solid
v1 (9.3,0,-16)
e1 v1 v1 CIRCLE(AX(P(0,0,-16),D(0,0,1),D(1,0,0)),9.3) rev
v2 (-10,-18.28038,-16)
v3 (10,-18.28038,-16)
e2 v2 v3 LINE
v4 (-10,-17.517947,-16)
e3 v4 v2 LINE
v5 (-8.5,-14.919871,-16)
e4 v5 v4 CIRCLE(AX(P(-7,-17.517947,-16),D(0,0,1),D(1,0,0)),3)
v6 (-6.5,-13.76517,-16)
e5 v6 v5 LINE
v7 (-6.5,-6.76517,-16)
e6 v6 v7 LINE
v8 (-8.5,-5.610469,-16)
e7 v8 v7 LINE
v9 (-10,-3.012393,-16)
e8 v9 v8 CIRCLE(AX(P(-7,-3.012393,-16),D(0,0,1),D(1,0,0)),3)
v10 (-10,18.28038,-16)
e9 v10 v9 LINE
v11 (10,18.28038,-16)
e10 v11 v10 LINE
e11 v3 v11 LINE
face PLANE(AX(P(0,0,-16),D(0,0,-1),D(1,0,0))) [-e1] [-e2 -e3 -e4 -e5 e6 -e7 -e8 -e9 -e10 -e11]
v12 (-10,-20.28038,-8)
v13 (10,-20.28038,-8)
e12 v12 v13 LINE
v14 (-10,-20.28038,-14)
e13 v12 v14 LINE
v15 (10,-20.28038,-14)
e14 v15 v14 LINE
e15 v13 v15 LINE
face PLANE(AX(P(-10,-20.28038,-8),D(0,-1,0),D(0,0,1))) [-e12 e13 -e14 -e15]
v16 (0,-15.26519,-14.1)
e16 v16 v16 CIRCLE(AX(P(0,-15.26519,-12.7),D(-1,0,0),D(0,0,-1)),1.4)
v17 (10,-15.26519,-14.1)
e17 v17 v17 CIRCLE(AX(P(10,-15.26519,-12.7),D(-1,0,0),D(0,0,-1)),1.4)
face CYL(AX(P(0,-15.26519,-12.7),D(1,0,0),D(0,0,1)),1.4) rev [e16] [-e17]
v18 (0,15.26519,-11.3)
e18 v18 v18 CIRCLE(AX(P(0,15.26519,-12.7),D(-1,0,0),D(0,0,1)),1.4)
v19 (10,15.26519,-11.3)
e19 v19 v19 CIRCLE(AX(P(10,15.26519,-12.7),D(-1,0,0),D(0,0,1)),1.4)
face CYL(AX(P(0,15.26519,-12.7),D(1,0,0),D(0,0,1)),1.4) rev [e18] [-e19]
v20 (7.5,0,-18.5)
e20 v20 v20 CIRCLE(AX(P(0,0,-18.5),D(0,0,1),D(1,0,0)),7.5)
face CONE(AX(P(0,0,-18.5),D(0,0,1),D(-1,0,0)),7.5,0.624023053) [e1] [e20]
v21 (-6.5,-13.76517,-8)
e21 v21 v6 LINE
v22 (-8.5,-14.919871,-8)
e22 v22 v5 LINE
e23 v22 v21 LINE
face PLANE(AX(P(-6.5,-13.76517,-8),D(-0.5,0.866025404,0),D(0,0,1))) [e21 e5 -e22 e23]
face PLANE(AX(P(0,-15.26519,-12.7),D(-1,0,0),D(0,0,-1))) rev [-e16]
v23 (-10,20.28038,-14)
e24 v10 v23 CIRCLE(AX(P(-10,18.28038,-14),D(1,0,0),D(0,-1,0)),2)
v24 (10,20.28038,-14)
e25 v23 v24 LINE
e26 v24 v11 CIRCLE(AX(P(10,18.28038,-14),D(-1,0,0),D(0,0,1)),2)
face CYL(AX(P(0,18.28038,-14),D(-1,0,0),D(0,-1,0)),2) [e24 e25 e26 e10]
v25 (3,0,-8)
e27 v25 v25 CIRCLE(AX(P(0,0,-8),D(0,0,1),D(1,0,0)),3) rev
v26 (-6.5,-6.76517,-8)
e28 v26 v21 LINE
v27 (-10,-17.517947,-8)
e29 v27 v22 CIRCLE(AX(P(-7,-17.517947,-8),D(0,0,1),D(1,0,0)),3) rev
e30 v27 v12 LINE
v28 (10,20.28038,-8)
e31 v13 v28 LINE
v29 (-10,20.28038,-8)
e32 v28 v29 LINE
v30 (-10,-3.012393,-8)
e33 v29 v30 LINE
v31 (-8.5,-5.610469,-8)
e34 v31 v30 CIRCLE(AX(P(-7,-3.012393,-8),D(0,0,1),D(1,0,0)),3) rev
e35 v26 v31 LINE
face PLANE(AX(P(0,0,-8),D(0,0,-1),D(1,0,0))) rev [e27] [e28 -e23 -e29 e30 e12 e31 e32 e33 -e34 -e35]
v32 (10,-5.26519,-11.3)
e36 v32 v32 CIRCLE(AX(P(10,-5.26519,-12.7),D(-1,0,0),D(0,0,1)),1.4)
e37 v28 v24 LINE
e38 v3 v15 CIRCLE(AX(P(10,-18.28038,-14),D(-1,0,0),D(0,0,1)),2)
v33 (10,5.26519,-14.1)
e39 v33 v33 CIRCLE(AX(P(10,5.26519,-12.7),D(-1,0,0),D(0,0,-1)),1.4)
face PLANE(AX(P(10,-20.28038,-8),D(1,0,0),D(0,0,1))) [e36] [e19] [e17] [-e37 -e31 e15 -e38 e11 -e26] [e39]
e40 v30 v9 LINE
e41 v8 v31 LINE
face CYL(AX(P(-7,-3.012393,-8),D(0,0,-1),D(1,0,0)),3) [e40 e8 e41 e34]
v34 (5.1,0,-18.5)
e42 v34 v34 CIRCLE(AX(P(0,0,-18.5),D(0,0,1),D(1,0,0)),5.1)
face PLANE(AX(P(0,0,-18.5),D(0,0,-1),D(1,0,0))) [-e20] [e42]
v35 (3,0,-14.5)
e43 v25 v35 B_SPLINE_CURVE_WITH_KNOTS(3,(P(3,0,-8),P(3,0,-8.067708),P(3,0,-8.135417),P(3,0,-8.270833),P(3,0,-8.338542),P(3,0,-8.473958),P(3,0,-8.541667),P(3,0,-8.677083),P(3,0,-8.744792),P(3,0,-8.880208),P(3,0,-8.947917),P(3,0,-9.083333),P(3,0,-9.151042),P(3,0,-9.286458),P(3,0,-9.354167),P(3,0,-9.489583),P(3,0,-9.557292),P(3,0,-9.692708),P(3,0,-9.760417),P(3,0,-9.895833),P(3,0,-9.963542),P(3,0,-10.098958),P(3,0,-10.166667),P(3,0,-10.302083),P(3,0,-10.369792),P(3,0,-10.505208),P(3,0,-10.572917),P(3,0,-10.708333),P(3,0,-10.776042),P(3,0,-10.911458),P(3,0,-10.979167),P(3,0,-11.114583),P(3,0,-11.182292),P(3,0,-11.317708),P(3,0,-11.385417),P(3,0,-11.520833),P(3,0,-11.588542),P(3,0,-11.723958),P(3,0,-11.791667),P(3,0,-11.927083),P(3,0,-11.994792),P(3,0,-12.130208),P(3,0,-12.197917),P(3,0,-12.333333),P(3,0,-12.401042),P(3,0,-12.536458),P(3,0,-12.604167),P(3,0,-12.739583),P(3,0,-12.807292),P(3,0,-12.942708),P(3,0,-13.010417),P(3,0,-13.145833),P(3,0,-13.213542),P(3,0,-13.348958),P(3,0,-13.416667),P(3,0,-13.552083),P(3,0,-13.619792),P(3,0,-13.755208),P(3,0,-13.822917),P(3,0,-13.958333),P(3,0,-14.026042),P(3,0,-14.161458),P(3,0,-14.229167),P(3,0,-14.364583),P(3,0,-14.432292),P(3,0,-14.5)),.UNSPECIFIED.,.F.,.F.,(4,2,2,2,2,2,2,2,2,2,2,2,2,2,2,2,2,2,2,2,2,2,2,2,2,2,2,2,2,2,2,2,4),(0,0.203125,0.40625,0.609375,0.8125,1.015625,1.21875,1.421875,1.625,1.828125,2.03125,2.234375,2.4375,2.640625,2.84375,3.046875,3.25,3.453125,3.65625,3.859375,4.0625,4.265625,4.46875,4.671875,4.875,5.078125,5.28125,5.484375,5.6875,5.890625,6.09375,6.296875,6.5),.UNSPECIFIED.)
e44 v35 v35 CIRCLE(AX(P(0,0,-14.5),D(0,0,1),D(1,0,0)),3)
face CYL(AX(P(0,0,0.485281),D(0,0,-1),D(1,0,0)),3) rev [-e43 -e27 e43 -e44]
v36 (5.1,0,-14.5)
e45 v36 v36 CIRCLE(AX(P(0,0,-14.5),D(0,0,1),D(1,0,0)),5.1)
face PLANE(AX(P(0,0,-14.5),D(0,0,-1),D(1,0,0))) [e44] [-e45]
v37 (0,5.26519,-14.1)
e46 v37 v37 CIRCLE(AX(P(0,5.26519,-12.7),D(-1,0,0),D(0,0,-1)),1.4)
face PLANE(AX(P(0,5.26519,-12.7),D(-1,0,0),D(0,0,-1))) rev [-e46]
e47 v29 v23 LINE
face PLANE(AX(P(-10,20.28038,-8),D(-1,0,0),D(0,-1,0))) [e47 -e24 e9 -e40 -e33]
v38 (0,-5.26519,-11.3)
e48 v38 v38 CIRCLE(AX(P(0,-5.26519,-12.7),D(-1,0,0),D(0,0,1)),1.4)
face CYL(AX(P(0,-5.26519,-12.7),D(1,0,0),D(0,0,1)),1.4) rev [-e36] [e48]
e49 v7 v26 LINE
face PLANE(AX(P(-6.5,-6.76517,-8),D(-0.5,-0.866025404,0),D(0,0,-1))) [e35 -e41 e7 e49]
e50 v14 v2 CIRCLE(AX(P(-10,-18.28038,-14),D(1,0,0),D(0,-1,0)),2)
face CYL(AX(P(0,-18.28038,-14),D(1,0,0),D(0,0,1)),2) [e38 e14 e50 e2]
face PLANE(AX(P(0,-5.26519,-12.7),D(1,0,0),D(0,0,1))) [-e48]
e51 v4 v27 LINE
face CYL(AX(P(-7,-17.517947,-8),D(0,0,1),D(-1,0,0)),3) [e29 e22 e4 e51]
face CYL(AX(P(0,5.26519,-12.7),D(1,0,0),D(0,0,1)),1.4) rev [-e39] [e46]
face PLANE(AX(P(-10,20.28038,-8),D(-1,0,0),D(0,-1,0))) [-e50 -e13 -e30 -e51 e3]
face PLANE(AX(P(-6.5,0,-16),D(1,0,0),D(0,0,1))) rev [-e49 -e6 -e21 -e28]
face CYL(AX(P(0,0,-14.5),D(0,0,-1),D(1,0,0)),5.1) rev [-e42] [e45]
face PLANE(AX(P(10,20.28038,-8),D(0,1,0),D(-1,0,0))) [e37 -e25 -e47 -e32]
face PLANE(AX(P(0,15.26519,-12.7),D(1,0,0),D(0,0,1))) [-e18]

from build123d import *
from OCP.BRepFilletAPI import BRepFilletAPI_MakeChamfer

# Parameters (mm, degrees)
SKETCH1_W                     = 20
SKETCH1_H                     = 40.56076
BOSS_EXTRUDE1_DEPTH           = 8
SKETCH6_R                     = 1.4
CUT_EXTRUDE1_DEPTH            = 10
SKETCH8_R                     = 7.5
BOSS_EXTRUDE2_DEPTH           = 2.5
SKETCH9_R                     = 5.1
CUT_EXTRUDE3_DEPTH            = 4
SKETCH10_R                    = 3
CUT_EXTRUDE4_DEPTH            = 6.5
FILLET1_R                     = 2
CHAMFER1_SIZE2                = 2.5
CHAMFER1_SIZE                 = 1.8
SKETCH11_W                    = 8
SKETCH11_H                    = 7
CUT_EXTRUDE5_DEPTH            = 3.5
CHAMFER2_SIZE                 = 2.020725942
CHAMFER2_SIZE_2               = 3.5
FILLET2_R                     = 3
BODY_MOVE_COPY1_OUTLINE_W     = 2.1
BODY_MOVE_COPY1_OUTLINE_H     = 6.5
BODY_MOVE_COPY1_START         = -10
BODY_MOVE_COPY1_2_DEPTH       = 20
BODY_MOVE_COPY1_3_OUTLINE_R   = 1.4
BODY_MOVE_COPY1_3_DEPTH       = 4.176980959
BODY_MOVE_COPY1_4_OUTLINE_R   = 1.4
BODY_MOVE_COPY1_4_DEPTH       = 20
BODY_MOVE_COPY1_5_OUTLINE_R   = 1.4
BODY_MOVE_COPY1_5_DEPTH       = 10
BODY_MOVE_COPY1_6_OUTLINE_R   = 5.1
BODY_MOVE_COPY1_6_DEPTH       = 2.5
BODY_MOVE_COPY1_START_2       = -16
BODY_MOVE_COPY1_7_OUTLINE_R   = 3
BODY_MOVE_COPY1_7_DEPTH       = 8
BODY_MOVE_COPY1_8_OUTLINE_R   = 5.1
BODY_MOVE_COPY1_8_OUTLINE_R_2 = 3
BODY_MOVE_COPY1_8_DEPTH       = 1.5


with BuildPart() as part:
    # Sketch1 → Boss-Extrude1 (new body)
    with BuildSketch(Plane.XY):
        Rectangle(SKETCH1_W, SKETCH1_H)
    extrude(amount=-BOSS_EXTRUDE1_DEPTH)

    # Sketch6 → Cut-Extrude1 (cut)
    with BuildSketch(Plane(origin=(10, 0, 0), x_dir=(0, 0, -1), z_dir=(1, 0, 0))):
        with Locations(Location((3.3, -15.26519, 0), (0, 0, 180))):
            Circle(SKETCH6_R)
        with Locations((3.3, -5.26519)):
            Circle(SKETCH6_R)
        with Locations((3.3, 15.26519)):
            Circle(SKETCH6_R)
        with Locations(Location((3.3, 5.26519, 0), (0, 0, 180))):
            Circle(SKETCH6_R)
    extrude(amount=-CUT_EXTRUDE1_DEPTH, mode=Mode.SUBTRACT)

    # Sketch8 → Boss-Extrude2 (add)
    with BuildSketch(Plane.XY):
        Circle(SKETCH8_R)
    extrude(amount=BOSS_EXTRUDE2_DEPTH)

    # Sketch9 → Cut-Extrude3 (cut)
    with BuildSketch(Plane.XY.offset(2.5)):
        Circle(SKETCH9_R)
    extrude(amount=-CUT_EXTRUDE3_DEPTH, mode=Mode.SUBTRACT)

    # Sketch10 → Cut-Extrude4 (cut)
    with BuildSketch(Plane.XY.offset(-1.5)):
        Circle(SKETCH10_R)
    extrude(amount=-CUT_EXTRUDE4_DEPTH, mode=Mode.SUBTRACT)

    # Fillet1
    fillet1_edges = [part.edges().sort_by_distance(p)[0] for p in [
        (0, -20.28038, 0),
        (0, 20.28038, 0),
    ]]
    fillet(fillet1_edges, radius=FILLET1_R)

    # Chamfer1
    chamfer1_edges = [part.edges().sort_by_distance(p)[0] for p in [
        (-7.5, 0, 0),
    ]]
    chamfer1_side = [part.faces().sort_by_distance(p)[0] for p in [
        (-7.536, 0, 0),
    ]]
    chamfer(chamfer1_edges, length=CHAMFER1_SIZE - 0.0001, length2=CHAMFER1_SIZE2 - 0.0001, reference=chamfer1_side[0])  # a hair under: the kernel refuses the full size

    # Sketch11 → Cut-Extrude5 (cut)
    with BuildSketch(Plane.ZY.offset(10)):
        with Locations((-4, -10.26517)):
            Rectangle(SKETCH11_W, SKETCH11_H)
    extrude(amount=-CUT_EXTRUDE5_DEPTH, mode=Mode.SUBTRACT)

    # Chamfer2
    chamfer2_edges_1 = [part.edges().sort_by_distance(p)[0] for p in [
        (-10, -13.76517, -4),
    ]]
    chamfer2_side_1 = [part.faces().sort_by_distance(p)[0] for p in [
        (-10, -13.805584519, -4),
    ]]
    chamfer2_edges_2 = [part.edges().sort_by_distance(p)[0] for p in [
        (-10, -6.76517, -4),
    ]]
    chamfer2_side_2 = [part.faces().sort_by_distance(p)[0] for p in [
        (-9.959585481, -6.76517, -4),
    ]]
    chamfer2 = BRepFilletAPI_MakeChamfer(part.part.solid().wrapped)
    for e in chamfer2_edges_1:
        chamfer2.Add(CHAMFER2_SIZE - 0.0001, CHAMFER2_SIZE_2 - 0.0001, e.wrapped, chamfer2_side_1[0].wrapped)
    for e in chamfer2_edges_2:
        chamfer2.Add(CHAMFER2_SIZE_2 - 0.0001, CHAMFER2_SIZE - 0.0001, e.wrapped, chamfer2_side_2[0].wrapped)
    add(Compound.cast(chamfer2.Shape()), mode=Mode.REPLACE)  # a hair under: the kernel refuses the full size

    # Fillet2
    fillet2_edges = [part.edges().sort_by_distance(p)[0] for p in [
        (-10, -15.785795942, -4),
        (-10, -4.744544058, -4),
    ]]
    fillet(fillet2_edges, radius=FILLET2_R)

    # Body-Move/Copy1: read off the stored shape, not the designer's step
    # Body-Move/Copy1 outline → Body-Move/Copy1 (revolve)
    with BuildSketch(Plane.XZ):
        Polygon((7.5, -18.5), (9.3, -16), (5.1, -16), (5.1, -18.5), align=None)
        with Locations((4.05, -11.25)):
            Rectangle(BODY_MOVE_COPY1_OUTLINE_W, BODY_MOVE_COPY1_OUTLINE_H)
    revolve(axis=Axis((0, 0, 0), (0, 0, 1)))

    # Body-Move_Copy1 2 outline → Body-Move_Copy1 2 (cut)
    with BuildSketch(Plane.YZ.offset(BODY_MOVE_COPY1_START)):
        with BuildLine():
            Line((-20.28038, -8), (20.28038, -8))
            Line((20.28038, -8), (20.28038, -2))
            ThreePointArc((20.28038, -2), (19.694593562, -0.585786438), (18.28038, 0))
            Line((18.28038, 0), (-18.28038, 0))
            ThreePointArc((-18.28038, 0), (-19.694593562, -0.585786438), (-20.28038, -2))
            Line((-20.28038, -2), (-20.28038, -8))
        make_face()
    extrude(amount=BODY_MOVE_COPY1_2_DEPTH, mode=Mode.SUBTRACT)

    # Body-Move_Copy1 3 outline → Body-Move_Copy1 3 (cut)
    with BuildSketch(Plane.YZ):
        with Locations((-5.26519, -12.7)):
            Circle(BODY_MOVE_COPY1_3_OUTLINE_R)
        with Locations((5.26519, -12.7)):
            Circle(BODY_MOVE_COPY1_3_OUTLINE_R)
    extrude(amount=BODY_MOVE_COPY1_3_DEPTH, mode=Mode.SUBTRACT)

    # Body-Move_Copy1 4 outline → Body-Move_Copy1 4 (add)
    with BuildSketch(Plane.YZ.offset(BODY_MOVE_COPY1_START)):
        with BuildLine():
            ThreePointArc((18.28038, -16), (19.694593562, -15.414213562), (20.28038, -14))
            Line((20.28038, -14), (20.28038, -8))
            Line((20.28038, -8), (-20.28038, -8))
            Line((-20.28038, -8), (-20.28038, -14))
            ThreePointArc((-20.28038, -14), (-19.694593562, -15.414213562), (-18.28038, -16))
            Line((-18.28038, -16), (18.28038, -16))
        make_face()
        with Locations((-15.26519, -12.7)):
            Circle(BODY_MOVE_COPY1_4_OUTLINE_R, mode=Mode.SUBTRACT)
        with Locations((-5.26519, -12.7)):
            Circle(BODY_MOVE_COPY1_4_OUTLINE_R, mode=Mode.SUBTRACT)
        with Locations((5.26519, -12.7)):
            Circle(BODY_MOVE_COPY1_4_OUTLINE_R, mode=Mode.SUBTRACT)
        with Locations((15.26519, -12.7)):
            Circle(BODY_MOVE_COPY1_4_OUTLINE_R, mode=Mode.SUBTRACT)
    extrude(amount=BODY_MOVE_COPY1_4_DEPTH)

    # Body-Move_Copy1 5 outline → Body-Move_Copy1 5 (add)
    with BuildSketch(Plane.YZ.offset(BODY_MOVE_COPY1_START)):
        with Locations((-5.26519, -12.7)):
            Circle(BODY_MOVE_COPY1_5_OUTLINE_R)
        with Locations((15.26519, -12.7)):
            Circle(BODY_MOVE_COPY1_5_OUTLINE_R)
        with Locations((5.26519, -12.7)):
            Circle(BODY_MOVE_COPY1_5_OUTLINE_R)
        with Locations((-15.26519, -12.7)):
            Circle(BODY_MOVE_COPY1_5_OUTLINE_R)
    extrude(amount=BODY_MOVE_COPY1_5_DEPTH)

    # Body-Move_Copy1 6 outline → Body-Move_Copy1 6 (cut)
    with BuildSketch(Plane.XY):
        with BuildLine():
            Line((-6.5, -6.76517), (-6.5, -13.76517))
            Line((-6.5, -13.76517), (-8.5, -14.919870538))
            ThreePointArc((-8.5, -14.919870538), (-9.598076211, -16.01794675), (-10, -17.51794675))
            Line((-10, -17.51794675), (-10, -19))
            Line((-10, -19), (11, -19))
            Line((11, -19), (11, 11))
            Line((11, 11), (-10.000000008, 11))
            Line((-10.000000008, 11), (-10, -3.01239325))
            ThreePointArc((-10, -3.01239325), (-9.598076211, -4.51239325), (-8.5, -5.610469462))
            Line((-8.5, -5.610469462), (-6.5, -6.76517))
        make_face()
        Circle(BODY_MOVE_COPY1_6_OUTLINE_R, mode=Mode.SUBTRACT)
    extrude(amount=BODY_MOVE_COPY1_6_DEPTH, mode=Mode.SUBTRACT)

    # Body-Move_Copy1 7 outline → Body-Move_Copy1 7 (cut)
    with BuildSketch(Plane.XY.offset(BODY_MOVE_COPY1_START_2)):
        Circle(BODY_MOVE_COPY1_7_OUTLINE_R)
        with BuildLine():
            Line((-8.5, -14.919870538), (-6.5, -13.76517))
            Line((-6.5, -13.76517), (-6.5, -6.76517))
            Line((-6.5, -6.76517), (-8.5, -5.610469462))
            ThreePointArc((-8.5, -5.610469462), (-9.598076211, -4.51239325), (-10, -3.01239325))
            Line((-10, -3.01239325), (-10, -17.51794675))
            ThreePointArc((-10, -17.51794675), (-9.598076211, -16.01794675), (-8.5, -14.919870538))
        make_face()
    extrude(amount=BODY_MOVE_COPY1_7_DEPTH, mode=Mode.SUBTRACT)

    # Body-Move_Copy1 8 outline → Body-Move_Copy1 8 (cut)
    with BuildSketch(Plane.XY.offset(BODY_MOVE_COPY1_START_2)):
        Circle(BODY_MOVE_COPY1_8_OUTLINE_R)
        Circle(BODY_MOVE_COPY1_8_OUTLINE_R_2, mode=Mode.SUBTRACT)
    extrude(amount=BODY_MOVE_COPY1_8_DEPTH, mode=Mode.SUBTRACT)


solid = part.part
